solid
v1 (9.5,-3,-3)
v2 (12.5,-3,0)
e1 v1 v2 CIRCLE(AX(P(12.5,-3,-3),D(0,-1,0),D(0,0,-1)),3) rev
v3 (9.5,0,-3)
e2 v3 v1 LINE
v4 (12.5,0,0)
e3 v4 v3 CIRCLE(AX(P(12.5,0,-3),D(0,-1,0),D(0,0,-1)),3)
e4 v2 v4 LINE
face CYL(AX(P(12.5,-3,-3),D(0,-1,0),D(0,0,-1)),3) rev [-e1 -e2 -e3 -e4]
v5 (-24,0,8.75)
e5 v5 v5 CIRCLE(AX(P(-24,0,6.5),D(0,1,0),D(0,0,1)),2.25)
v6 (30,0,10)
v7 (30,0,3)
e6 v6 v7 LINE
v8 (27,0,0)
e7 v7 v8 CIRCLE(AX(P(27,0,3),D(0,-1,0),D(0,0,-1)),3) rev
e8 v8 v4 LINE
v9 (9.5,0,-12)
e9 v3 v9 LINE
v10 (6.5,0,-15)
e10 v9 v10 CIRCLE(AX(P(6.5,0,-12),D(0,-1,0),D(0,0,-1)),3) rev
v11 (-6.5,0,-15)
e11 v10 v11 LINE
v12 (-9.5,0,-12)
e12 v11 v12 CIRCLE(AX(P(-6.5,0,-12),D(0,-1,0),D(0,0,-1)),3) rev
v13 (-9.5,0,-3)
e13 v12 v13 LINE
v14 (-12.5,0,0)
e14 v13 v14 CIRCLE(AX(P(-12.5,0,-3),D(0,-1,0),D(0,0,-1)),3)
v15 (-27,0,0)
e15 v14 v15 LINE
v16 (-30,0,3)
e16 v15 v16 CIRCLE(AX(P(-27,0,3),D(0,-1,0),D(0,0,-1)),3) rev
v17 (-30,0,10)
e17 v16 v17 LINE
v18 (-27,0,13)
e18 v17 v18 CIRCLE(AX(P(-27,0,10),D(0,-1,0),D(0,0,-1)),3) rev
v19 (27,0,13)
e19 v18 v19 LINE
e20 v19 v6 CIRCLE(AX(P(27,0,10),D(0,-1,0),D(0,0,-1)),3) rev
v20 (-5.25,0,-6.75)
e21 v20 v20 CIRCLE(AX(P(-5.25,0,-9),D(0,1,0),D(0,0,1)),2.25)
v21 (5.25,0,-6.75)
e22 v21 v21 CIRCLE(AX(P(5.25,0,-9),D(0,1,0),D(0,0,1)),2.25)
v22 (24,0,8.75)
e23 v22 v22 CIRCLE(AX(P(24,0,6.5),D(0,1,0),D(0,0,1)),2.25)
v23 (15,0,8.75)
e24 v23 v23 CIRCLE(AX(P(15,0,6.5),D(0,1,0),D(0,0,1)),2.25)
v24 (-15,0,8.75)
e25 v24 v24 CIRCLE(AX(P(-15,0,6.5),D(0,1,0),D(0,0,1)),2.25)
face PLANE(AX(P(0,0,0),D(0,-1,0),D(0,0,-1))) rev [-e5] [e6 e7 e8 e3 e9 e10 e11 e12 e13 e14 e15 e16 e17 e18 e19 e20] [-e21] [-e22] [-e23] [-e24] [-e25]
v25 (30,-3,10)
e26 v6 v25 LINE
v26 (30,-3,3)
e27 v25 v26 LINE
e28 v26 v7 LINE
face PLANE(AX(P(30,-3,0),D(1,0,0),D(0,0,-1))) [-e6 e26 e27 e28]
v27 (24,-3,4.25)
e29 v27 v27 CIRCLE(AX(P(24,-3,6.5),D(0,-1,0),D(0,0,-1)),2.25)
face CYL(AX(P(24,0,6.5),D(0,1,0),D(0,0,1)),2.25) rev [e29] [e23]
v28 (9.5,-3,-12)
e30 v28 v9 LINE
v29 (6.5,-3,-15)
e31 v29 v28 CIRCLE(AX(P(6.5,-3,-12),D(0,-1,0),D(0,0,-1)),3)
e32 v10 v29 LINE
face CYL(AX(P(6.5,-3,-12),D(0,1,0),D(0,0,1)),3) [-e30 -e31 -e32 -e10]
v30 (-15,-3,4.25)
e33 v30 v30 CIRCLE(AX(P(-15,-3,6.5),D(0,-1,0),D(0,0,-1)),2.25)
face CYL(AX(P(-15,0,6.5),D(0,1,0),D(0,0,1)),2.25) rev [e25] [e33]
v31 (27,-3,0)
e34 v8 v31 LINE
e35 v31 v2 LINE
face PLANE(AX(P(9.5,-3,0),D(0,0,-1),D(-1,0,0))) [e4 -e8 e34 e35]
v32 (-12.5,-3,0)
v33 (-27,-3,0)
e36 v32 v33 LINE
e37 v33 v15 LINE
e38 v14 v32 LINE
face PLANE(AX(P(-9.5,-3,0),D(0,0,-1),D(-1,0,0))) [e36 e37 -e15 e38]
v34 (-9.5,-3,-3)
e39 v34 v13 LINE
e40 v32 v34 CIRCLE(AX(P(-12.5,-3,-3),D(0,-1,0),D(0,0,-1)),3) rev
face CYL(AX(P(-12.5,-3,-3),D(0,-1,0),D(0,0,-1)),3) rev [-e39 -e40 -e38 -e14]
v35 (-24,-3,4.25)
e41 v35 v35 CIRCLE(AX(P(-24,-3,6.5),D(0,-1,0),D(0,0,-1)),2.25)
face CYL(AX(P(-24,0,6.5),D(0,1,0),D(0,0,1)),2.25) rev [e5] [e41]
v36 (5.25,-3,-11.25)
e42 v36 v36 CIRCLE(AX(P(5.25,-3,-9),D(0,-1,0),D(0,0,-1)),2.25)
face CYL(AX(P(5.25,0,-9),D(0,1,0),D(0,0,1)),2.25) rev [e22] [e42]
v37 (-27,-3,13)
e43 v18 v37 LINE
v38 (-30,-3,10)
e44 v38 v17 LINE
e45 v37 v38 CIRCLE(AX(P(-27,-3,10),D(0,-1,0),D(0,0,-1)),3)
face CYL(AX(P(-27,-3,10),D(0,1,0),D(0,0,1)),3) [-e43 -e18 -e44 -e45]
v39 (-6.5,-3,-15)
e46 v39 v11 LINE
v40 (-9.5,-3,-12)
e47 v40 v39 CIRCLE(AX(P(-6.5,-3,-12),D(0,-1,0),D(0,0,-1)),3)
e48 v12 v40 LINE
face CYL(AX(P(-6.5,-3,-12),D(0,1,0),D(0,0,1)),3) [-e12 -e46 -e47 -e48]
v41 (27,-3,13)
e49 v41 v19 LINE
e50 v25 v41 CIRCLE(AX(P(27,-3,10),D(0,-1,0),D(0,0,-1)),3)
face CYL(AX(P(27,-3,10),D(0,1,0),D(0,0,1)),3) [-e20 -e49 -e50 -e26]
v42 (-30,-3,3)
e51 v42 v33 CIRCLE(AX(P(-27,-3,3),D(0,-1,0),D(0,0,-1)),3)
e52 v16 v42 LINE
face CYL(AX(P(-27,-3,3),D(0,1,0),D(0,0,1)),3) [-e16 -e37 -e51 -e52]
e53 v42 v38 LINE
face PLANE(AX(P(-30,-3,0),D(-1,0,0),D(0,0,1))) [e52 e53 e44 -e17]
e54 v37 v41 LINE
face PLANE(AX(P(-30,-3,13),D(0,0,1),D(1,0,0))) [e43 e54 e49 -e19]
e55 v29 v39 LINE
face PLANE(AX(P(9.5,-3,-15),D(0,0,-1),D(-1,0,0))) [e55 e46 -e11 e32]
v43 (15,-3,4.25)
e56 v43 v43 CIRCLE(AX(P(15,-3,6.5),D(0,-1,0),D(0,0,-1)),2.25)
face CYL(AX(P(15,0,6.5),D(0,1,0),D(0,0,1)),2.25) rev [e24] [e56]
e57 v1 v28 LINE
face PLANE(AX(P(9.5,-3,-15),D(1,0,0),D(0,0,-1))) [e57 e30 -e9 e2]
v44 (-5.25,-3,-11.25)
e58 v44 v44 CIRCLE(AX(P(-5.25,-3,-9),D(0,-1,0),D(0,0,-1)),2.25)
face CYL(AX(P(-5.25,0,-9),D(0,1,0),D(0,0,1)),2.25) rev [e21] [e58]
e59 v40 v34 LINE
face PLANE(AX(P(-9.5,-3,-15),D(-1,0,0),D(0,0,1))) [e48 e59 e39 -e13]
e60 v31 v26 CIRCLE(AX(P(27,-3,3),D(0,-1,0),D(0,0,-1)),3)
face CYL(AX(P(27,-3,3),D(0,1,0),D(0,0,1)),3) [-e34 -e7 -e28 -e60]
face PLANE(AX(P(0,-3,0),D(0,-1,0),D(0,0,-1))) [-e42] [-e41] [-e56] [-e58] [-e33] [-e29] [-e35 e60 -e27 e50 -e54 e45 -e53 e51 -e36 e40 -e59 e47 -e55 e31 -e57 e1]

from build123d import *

# Parameters (mm, degrees)
ODGI_CIE_BAZOWE1_DEPTH  = 3
OTW_R_POD_RUB_M41_D     = 4.5
OTW_R_POD_RUB_M41_DEPTH = 10
OTW_R_POD_RUB_M41_TIP   = 1.351936393
ZAOKR_GLENIE1_R         = 3


# Sheet-metal steps are written as plain solids
with BuildPart() as part:
    # Szkic1 → Odgięcie bazowe1 (new body)
    with BuildSketch(Plane(origin=(0, 0, 0), x_dir=(1, 0, 0), z_dir=(0, 1, 0))):
        Polygon((9.5, 15), (-9.5, 15), (-9.5, 0), (-30, 0), (-30, -13), (30, -13), (30, 0), (9.5, 0), align=None)
    extrude(amount=-ODGI_CIE_BAZOWE1_DEPTH)

    # Otwór pod śrubę M41
    with Locations(Plane(origin=(0, 0, 0), x_dir=(1, 0, 0), z_dir=(0, 1, 0))):
        with Locations((-5.25, 9), (5.25, 9), (-15, -6.5), (15, -6.5), (-24, -6.5), (24, -6.5)):
            Hole(OTW_R_POD_RUB_M41_D / 2, depth=OTW_R_POD_RUB_M41_DEPTH)
            with Locations((0, 0, -(OTW_R_POD_RUB_M41_DEPTH + OTW_R_POD_RUB_M41_TIP / 2))):  # 118° drill point
                Cone(0, OTW_R_POD_RUB_M41_D / 2, OTW_R_POD_RUB_M41_TIP, mode=Mode.SUBTRACT)

    # Zaokrąglenie1
    zaokr_glenie1_edges = [part.edges().sort_by_distance(p)[0] for p in [
        (-9.5, -1.5, -15),
        (9.5, -1.5, -15),
        (9.5, -1.5, 0),
        (30, -1.5, 0),
        (30, -1.5, 13),
        (-30, -1.5, 13),
        (-30, -1.5, 0),
        (-9.5, -1.5, 0),
    ]]
    fillet(zaokr_glenie1_edges, radius=ZAOKR_GLENIE1_R)


solid = part.part
